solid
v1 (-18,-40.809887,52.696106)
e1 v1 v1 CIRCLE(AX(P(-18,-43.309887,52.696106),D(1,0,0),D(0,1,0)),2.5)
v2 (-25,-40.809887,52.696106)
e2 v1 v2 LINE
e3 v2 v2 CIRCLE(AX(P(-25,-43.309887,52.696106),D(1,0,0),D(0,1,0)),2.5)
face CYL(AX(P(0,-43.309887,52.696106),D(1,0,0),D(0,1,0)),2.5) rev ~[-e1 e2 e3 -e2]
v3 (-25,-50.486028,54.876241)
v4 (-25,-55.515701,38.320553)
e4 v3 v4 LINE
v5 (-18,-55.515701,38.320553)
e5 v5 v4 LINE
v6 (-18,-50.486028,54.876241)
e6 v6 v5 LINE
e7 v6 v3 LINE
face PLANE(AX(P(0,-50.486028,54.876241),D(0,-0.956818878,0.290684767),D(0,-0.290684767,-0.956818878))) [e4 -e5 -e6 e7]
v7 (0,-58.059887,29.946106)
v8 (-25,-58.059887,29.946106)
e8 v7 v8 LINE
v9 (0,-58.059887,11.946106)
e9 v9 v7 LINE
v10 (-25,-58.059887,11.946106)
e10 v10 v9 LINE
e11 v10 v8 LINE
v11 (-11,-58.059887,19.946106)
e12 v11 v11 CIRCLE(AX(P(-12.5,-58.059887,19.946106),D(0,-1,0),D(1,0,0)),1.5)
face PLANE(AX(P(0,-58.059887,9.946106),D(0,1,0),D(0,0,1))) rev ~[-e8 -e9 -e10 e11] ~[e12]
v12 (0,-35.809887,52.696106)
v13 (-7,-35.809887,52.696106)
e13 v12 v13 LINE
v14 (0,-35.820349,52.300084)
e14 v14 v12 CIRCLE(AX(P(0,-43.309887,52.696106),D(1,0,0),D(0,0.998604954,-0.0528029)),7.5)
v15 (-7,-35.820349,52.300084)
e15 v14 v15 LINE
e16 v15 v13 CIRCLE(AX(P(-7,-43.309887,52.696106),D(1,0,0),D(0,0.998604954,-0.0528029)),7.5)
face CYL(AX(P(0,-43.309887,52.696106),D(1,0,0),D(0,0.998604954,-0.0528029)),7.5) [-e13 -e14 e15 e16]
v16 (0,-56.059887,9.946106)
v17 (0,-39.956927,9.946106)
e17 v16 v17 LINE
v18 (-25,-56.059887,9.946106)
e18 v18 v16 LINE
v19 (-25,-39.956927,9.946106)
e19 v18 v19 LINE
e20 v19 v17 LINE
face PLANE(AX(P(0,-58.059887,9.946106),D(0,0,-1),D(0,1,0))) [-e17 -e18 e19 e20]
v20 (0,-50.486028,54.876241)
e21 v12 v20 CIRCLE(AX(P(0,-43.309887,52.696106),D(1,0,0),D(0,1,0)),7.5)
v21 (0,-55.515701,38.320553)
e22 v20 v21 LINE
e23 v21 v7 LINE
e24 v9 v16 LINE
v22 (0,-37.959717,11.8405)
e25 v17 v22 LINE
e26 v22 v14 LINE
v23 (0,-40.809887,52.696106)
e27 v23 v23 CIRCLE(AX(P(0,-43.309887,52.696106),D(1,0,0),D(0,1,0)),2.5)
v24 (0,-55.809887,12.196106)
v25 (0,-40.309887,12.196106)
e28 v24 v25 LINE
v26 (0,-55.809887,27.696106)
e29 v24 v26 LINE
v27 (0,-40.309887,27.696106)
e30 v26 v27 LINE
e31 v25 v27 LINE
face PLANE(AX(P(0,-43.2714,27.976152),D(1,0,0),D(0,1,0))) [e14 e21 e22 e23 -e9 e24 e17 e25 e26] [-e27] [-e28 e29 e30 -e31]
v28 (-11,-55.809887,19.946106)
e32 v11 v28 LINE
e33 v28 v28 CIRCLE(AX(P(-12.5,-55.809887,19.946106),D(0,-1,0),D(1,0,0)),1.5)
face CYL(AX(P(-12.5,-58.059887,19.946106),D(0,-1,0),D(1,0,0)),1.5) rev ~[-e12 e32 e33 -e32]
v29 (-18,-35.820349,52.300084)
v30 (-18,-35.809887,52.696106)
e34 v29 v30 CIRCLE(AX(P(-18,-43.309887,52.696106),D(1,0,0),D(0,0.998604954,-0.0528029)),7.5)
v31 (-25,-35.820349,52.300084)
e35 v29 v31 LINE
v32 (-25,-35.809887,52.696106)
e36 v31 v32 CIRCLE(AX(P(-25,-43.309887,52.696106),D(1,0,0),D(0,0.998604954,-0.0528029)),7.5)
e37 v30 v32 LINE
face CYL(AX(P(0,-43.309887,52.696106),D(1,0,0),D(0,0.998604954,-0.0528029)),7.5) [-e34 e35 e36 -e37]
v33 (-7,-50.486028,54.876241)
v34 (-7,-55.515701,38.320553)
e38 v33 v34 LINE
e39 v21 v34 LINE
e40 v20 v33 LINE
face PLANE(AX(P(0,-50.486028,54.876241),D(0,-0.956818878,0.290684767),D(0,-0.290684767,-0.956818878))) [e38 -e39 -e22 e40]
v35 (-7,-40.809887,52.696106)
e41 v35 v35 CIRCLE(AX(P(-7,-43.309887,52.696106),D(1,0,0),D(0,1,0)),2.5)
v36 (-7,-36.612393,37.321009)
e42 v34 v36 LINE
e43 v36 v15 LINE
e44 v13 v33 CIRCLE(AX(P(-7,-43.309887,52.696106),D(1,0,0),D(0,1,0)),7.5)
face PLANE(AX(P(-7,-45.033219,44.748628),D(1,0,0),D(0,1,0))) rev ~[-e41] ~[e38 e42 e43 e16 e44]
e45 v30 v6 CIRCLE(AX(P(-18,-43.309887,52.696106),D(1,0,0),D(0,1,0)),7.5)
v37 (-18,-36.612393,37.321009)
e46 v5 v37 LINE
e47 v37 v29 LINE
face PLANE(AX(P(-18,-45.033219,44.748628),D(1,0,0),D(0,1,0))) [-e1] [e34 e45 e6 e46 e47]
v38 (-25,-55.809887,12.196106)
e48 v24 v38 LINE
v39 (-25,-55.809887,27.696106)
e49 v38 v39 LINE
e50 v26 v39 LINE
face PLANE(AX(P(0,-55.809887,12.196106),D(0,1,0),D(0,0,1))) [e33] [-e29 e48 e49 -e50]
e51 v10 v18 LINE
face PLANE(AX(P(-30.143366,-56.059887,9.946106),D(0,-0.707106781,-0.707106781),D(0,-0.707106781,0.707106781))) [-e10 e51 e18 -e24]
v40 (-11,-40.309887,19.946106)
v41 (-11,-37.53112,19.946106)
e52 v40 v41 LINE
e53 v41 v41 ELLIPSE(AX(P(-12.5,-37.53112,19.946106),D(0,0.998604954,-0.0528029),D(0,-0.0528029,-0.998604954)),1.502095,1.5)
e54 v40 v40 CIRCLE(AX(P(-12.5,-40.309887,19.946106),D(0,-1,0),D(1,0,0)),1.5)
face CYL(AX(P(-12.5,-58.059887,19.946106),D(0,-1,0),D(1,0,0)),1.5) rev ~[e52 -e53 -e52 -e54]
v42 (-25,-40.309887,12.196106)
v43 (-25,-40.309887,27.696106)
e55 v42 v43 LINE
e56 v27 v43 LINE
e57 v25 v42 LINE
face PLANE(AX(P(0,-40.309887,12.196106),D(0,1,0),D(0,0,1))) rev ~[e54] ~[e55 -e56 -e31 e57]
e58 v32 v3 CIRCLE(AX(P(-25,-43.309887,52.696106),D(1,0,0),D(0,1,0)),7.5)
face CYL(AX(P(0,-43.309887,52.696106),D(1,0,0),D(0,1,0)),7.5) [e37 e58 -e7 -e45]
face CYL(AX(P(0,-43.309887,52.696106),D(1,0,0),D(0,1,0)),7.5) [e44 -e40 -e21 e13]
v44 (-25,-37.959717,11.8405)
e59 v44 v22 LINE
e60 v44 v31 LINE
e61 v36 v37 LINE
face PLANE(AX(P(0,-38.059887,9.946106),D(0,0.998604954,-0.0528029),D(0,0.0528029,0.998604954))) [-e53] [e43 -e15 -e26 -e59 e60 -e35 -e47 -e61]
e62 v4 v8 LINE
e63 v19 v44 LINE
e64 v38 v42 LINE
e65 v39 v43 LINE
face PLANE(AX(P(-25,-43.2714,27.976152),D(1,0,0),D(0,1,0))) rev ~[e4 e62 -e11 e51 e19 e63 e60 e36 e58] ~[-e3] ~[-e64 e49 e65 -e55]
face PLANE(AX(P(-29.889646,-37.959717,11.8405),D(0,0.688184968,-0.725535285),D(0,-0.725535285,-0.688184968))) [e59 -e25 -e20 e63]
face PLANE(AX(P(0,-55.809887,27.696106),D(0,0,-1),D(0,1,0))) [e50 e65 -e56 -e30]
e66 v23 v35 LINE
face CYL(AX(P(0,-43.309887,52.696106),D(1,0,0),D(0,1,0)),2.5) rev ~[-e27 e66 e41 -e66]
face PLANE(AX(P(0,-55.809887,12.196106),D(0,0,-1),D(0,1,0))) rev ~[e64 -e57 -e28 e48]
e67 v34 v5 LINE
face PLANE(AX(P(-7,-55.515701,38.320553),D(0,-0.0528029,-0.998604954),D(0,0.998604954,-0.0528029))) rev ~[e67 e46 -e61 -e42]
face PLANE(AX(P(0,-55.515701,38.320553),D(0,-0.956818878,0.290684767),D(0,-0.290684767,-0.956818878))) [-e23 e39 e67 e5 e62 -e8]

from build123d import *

# Parameters (mm, degrees)
F0_R        = 2.5
F0_W        = 20
F0_H        = 20
F0_W_2      = 15.5
F0_H_2      = 15.5
F1_DEPTH    = 25
F2_START    = -7
F2_DEPTH    = 11
F3_R        = 1.5
F4_DEPTH    = 25
F5_T1_DEPTH = 35.2867319519
F5_T3_DEPTH = 34.7792924718


# Not quite as in the source:
# - a fillet or chamfer that OpenCascade refuses, or shapes differently, is made with other operations: its cross-section is extruded or revolved along the edge and cut away or added


with BuildPart() as f1:
    # F0 (on Right) → F1 (new body)
    with BuildSketch(Plane.YZ):
        Polygon((-55.5157013459, 38.3205534184), (-58.0598865449, 29.9461055547), (-38.0598865449, 29.9461055547), (-38.0598865449, 9.9461055547), (-36.6123928978, 37.3210094949), align=None)
        with BuildLine():
            ThreePointArc((-35.8098865449, 52.6961055547), (-42.207857033, 60.1146991515), (-50.4860281329, 54.8762413095))
            ThreePointArc((-50.4860281329, 54.8762413095), (-44.6074616185, 45.3092050593), (-35.8203493916, 52.3000838016))
            ThreePointArc((-35.8203493916, 52.3000838016), (-35.8125027129, 52.4980255834), (-35.8098865449, 52.6961055547))
        make_face()
        with Locations((-43.3098865449, 52.6961055547)):
            Circle(F0_R, mode=Mode.SUBTRACT)
        with Locations((-48.0598865449, 19.9461055547)):
            Rectangle(F0_W, F0_H)
        with Locations((-48.0598865449, 19.9461055547)):
            Rectangle(F0_W_2, F0_H_2, mode=Mode.SUBTRACT)
        with BuildLine():
            Line((-50.4860281329, 54.8762413095), (-55.5157013459, 38.3205534184))
            Line((-55.5157013459, 38.3205534184), (-36.6123928978, 37.3210094949))
            Line((-36.6123928978, 37.3210094949), (-35.8203493916, 52.3000838016))
            ThreePointArc((-35.8203493916, 52.3000838016), (-44.6074616185, 45.3092050593), (-50.4860281329, 54.8762413095))
        make_face()
    extrude(amount=-F1_DEPTH)

    # F0 (on Right) → F2 (cut)
    with BuildSketch(Plane.YZ.offset(F2_START)):
        with BuildLine():
            Line((-50.4860281329, 54.8762413095), (-55.5157013459, 38.3205534184))
            Line((-55.5157013459, 38.3205534184), (-36.6123928978, 37.3210094949))
            Line((-36.6123928978, 37.3210094949), (-35.8203493916, 52.3000838016))
            ThreePointArc((-35.8203493916, 52.3000838016), (-44.6074616185, 45.3092050593), (-50.4860281329, 54.8762413095))
        make_face()
        with BuildLine():
            ThreePointArc((-35.8098865449, 52.6961055547), (-42.207857033, 60.1146991515), (-50.4860281329, 54.8762413095))
            ThreePointArc((-50.4860281329, 54.8762413095), (-44.6074616185, 45.3092050593), (-35.8203493916, 52.3000838016))
            ThreePointArc((-35.8203493916, 52.3000838016), (-35.8125027129, 52.4980255834), (-35.8098865449, 52.6961055547))
        make_face()
        with Locations((-43.3098865449, 52.6961055547)):
            Circle(F0_R, mode=Mode.SUBTRACT)
    extrude(amount=-F2_DEPTH, mode=Mode.SUBTRACT)

    # F3 (on face) → F4 (cut)
    with BuildSketch(Plane.XZ.offset(58.0598865449)):
        with Locations((-12.5, 19.9461055547)):
            Circle(F3_R)
    extrude(amount=-F4_DEPTH, mode=Mode.SUBTRACT)

    # F5: chamfer of 2 on 2 edges, made by hand

    # F5_s2 → F5_t1 (cut)
    with BuildSketch(Plane.YZ.offset(-30.1433659759)):
        Polygon((-56.0598865449, 9.9461055547), (-58.0598865449, 11.9461055547), (-58.0598865449, 9.9461055547), align=None)
    extrude(amount=F5_T1_DEPTH, mode=Mode.SUBTRACT)

    # F5_s4 → F5_t3 (cut)
    with BuildSketch(Plane.YZ.offset(-29.8896462359)):
        Polygon((-37.959717296, 11.8404997539), (-39.9569272035, 9.9461055547), (-38.0598865449, 9.9461055547), align=None)
    extrude(amount=F5_T3_DEPTH, mode=Mode.SUBTRACT)


solid = f1.part
